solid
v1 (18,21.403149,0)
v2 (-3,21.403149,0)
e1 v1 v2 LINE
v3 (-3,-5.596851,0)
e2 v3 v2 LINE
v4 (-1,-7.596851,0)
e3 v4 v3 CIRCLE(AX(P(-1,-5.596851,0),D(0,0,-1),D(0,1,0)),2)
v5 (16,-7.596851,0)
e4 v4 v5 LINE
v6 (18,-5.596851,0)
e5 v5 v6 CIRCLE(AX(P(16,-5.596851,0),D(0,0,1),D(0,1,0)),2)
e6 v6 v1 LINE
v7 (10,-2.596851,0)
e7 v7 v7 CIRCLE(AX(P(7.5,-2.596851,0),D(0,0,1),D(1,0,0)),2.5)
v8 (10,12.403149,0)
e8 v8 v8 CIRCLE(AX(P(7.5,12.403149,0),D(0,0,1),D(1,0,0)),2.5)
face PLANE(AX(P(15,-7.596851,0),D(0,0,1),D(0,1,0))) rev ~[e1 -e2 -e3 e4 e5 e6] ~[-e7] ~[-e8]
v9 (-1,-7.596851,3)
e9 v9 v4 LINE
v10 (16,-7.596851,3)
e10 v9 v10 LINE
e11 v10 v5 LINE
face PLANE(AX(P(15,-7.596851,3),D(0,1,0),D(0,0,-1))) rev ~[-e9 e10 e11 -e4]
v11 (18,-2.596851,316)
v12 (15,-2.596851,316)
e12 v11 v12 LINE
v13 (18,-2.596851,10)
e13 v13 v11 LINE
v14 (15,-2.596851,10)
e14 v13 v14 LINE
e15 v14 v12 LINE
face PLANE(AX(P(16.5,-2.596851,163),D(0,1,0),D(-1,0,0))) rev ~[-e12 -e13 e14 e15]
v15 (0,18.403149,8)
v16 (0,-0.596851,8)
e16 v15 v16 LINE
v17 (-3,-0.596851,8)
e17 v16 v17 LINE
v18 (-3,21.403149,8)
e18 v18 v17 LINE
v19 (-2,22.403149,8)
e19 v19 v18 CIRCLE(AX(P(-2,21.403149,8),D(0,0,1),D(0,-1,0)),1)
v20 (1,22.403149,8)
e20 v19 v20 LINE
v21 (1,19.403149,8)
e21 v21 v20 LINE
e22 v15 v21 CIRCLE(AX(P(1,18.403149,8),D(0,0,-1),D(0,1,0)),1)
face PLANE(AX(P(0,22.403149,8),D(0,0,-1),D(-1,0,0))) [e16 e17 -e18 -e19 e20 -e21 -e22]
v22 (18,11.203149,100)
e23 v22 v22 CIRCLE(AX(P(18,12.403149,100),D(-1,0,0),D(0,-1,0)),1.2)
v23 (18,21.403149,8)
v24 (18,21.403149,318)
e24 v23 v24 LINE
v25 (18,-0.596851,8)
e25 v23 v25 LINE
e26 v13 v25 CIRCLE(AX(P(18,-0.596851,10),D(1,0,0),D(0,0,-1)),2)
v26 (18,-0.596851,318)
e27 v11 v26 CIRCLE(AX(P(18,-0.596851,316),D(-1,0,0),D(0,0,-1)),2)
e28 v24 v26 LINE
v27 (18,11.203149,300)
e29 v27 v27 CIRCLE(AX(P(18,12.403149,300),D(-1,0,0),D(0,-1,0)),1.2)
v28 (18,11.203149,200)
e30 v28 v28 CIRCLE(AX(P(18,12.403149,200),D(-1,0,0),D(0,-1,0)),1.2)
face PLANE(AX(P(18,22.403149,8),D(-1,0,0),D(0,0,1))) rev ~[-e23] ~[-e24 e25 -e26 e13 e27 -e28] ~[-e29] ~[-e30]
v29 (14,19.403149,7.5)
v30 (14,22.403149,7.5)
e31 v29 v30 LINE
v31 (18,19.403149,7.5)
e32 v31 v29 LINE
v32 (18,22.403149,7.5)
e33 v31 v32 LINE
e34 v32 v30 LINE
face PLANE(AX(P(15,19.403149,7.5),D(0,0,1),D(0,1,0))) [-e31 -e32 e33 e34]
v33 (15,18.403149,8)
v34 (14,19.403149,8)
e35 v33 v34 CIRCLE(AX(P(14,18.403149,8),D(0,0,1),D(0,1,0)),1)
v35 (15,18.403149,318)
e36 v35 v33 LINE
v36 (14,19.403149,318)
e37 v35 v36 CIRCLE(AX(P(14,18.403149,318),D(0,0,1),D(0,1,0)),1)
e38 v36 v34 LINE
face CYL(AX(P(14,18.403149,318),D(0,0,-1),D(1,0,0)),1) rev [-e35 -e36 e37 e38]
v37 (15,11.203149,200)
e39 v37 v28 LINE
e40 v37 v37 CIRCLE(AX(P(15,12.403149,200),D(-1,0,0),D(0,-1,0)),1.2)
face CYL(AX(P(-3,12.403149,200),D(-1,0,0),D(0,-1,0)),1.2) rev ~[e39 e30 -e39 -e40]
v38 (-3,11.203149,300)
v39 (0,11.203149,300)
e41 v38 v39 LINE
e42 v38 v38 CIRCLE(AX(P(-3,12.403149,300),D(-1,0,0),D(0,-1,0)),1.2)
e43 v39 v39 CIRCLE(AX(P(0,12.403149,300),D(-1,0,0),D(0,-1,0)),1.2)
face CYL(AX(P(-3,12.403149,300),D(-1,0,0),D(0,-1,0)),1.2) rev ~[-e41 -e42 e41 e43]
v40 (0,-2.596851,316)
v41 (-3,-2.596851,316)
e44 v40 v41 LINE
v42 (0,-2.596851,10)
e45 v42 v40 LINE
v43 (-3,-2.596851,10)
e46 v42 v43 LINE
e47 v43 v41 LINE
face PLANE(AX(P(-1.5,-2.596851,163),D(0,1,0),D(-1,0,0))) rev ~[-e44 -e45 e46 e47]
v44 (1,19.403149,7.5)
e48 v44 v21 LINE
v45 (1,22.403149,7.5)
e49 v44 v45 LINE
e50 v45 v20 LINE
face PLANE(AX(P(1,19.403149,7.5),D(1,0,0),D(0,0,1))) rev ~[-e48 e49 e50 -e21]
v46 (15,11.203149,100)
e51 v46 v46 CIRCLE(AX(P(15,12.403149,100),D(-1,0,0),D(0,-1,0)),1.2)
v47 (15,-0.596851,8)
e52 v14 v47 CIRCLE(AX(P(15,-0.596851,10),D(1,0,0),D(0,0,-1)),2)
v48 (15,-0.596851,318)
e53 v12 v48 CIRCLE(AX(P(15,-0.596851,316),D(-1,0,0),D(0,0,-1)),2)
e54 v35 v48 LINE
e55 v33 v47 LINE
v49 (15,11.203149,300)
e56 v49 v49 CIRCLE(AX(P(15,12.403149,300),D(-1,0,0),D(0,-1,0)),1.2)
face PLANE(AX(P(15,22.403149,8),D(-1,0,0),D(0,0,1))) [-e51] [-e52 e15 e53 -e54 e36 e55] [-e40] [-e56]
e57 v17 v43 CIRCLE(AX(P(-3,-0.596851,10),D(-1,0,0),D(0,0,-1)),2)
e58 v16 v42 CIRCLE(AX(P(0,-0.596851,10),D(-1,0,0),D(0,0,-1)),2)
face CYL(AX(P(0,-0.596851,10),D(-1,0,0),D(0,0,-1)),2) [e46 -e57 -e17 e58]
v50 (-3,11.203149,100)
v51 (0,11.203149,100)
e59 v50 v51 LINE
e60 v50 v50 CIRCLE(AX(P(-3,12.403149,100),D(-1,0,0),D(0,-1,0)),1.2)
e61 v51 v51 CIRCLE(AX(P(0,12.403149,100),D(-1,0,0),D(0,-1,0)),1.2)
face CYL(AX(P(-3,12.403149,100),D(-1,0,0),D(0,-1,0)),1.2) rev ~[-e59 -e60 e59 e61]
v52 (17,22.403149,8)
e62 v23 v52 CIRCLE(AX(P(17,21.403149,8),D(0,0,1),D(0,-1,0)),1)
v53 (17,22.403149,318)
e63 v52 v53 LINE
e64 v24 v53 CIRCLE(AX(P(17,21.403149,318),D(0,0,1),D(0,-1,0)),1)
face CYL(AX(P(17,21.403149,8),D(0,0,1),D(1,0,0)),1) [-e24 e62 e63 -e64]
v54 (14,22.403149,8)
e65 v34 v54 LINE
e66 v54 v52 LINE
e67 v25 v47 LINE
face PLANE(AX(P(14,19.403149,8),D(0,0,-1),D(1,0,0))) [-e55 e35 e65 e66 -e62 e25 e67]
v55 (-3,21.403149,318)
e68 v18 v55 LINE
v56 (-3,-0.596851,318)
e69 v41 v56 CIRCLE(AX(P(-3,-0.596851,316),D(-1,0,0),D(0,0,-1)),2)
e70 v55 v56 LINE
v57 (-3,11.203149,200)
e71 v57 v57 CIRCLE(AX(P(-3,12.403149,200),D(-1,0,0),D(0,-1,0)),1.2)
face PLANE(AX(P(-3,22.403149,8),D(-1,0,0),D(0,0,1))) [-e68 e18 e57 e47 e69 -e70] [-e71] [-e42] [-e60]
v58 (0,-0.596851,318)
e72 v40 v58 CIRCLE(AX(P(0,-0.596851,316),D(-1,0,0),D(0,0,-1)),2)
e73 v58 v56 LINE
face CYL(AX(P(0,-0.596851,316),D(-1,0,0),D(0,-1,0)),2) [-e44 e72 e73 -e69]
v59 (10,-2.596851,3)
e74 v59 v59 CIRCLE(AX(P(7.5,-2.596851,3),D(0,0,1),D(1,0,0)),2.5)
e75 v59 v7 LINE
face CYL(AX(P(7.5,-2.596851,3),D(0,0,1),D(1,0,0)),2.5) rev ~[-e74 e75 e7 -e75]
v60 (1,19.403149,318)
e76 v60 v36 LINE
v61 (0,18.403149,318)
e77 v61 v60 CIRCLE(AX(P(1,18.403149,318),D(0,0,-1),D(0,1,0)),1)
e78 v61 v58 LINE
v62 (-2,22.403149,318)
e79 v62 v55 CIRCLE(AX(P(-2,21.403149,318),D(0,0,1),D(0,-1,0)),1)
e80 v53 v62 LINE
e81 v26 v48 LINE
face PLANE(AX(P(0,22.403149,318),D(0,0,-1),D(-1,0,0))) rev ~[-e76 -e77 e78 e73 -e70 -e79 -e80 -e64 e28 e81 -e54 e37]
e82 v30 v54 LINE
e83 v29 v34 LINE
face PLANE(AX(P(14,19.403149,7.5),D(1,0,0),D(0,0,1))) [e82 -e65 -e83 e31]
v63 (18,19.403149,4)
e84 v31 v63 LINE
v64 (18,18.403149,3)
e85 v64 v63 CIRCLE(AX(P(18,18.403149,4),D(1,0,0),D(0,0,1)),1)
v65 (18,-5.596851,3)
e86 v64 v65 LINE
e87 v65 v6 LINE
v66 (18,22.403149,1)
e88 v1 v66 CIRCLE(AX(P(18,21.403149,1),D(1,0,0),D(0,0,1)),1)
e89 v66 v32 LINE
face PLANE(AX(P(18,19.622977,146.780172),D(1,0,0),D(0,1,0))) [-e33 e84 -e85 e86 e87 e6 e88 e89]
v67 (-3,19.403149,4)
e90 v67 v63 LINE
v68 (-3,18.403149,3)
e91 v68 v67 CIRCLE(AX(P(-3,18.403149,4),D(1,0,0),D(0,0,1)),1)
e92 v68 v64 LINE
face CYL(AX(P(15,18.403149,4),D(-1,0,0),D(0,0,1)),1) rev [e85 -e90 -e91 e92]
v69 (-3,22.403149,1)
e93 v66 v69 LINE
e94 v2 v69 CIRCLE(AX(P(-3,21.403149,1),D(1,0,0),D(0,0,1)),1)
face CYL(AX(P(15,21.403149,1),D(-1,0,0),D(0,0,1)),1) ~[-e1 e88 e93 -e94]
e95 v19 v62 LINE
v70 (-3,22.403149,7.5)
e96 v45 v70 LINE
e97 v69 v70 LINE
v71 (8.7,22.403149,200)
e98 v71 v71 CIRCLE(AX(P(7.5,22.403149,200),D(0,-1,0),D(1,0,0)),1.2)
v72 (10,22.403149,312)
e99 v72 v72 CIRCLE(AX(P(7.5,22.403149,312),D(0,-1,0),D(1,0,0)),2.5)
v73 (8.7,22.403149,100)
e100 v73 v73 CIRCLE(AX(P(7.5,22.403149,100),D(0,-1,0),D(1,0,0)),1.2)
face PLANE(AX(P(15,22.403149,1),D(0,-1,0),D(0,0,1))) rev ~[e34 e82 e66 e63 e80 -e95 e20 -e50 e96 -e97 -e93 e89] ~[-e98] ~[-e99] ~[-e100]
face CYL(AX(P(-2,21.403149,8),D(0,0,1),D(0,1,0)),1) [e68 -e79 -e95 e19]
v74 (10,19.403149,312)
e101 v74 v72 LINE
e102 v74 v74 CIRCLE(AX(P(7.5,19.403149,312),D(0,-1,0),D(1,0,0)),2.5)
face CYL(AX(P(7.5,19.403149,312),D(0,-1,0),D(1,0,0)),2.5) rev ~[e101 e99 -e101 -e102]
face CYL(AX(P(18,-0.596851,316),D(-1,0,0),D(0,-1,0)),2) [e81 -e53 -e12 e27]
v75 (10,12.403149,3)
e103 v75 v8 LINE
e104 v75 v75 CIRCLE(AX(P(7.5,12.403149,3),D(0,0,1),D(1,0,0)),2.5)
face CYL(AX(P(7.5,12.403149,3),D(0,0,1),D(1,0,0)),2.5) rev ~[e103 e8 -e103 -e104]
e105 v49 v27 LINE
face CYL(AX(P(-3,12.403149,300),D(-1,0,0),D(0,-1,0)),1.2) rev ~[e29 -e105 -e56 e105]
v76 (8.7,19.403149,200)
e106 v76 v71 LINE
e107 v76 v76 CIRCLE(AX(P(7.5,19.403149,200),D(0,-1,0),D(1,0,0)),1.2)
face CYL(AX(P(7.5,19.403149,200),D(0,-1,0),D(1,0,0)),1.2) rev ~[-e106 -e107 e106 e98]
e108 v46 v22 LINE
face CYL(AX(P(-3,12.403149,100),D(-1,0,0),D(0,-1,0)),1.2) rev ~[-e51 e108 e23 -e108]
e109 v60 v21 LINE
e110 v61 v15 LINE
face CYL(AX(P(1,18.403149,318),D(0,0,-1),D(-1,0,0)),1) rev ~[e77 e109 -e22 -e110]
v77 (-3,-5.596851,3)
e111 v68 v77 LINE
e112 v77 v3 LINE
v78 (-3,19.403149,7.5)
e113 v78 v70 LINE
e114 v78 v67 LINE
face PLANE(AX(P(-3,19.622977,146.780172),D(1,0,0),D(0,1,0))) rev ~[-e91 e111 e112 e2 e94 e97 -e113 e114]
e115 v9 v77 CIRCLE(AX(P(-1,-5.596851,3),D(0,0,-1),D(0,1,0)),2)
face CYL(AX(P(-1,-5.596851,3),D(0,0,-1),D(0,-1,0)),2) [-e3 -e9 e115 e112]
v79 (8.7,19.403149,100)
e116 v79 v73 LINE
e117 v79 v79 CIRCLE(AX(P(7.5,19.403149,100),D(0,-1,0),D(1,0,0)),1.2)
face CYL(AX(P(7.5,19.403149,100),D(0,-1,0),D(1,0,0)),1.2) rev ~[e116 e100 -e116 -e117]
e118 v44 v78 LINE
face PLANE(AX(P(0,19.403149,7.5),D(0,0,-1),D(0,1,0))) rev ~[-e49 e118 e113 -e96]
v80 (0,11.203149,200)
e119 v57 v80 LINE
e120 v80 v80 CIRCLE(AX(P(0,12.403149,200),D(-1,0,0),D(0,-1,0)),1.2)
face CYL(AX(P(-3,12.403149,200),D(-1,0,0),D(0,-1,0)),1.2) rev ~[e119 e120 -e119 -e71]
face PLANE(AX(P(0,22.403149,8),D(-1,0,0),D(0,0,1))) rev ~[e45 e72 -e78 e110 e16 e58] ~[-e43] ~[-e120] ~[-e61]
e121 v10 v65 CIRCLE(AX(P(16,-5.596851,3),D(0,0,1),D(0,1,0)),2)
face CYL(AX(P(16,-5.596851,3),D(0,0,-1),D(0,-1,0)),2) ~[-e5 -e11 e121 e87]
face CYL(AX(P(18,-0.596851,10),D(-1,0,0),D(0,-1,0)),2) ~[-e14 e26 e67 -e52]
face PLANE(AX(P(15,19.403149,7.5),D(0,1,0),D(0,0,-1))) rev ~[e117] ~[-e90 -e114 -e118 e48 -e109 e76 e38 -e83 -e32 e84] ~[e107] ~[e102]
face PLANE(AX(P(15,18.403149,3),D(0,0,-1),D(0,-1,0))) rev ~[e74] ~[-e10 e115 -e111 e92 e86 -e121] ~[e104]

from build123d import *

# Parameters (mm, degrees)
F1_DEPTH  = 15
F2_W      = 3
F2_H      = 310
F3_DEPTH  = 25
F4_R      = 2.5
F5_DEPTH  = 3
F6_W      = 1
F6_H      = 0.5
F7_DEPTH  = 3
F8_R      = 1
F9_R      = 2.5
F9_R_2    = 1.2
F10_DEPTH = 3
F11_R     = 1.2
F12_DEPTH = 34.2
F13_DEPTH = 3
F14_DEPTH = 3
F15_R     = 2


with BuildPart() as f1:
    # F0 (on Right) → F1 (new body)
    with BuildSketch(Plane.YZ):
        Polygon((-7.5968508422, 3), (-7.5968508422, 0), (22.4031491578, 0), (22.4031491578, 318), (19.4031491578, 318), (19.4031491578, 3), align=None)
    extrude(amount=F1_DEPTH)

    # F2 (on face) → F3 (join)
    with BuildSketch(Plane(origin=(0, 22.4031491578, 0), x_dir=(-1, 0, 0), z_dir=(0, 1, 0))):
        with Locations((1.5, 163)):
            Rectangle(F2_W, F2_H)
        with Locations((-16.5, 163)):
            Rectangle(F2_W, F2_H)
    extrude(amount=-F3_DEPTH)

    # F4 (on face) → F5 (cut)
    with BuildSketch(Plane.XY.offset(3)):
        with Locations((7.5, -2.5968508422)):
            Circle(F4_R)
        with Locations((7.5, 12.4031491578)):
            Circle(F4_R)
    extrude(amount=-F5_DEPTH, mode=Mode.SUBTRACT)

    # F6 (on face) → F7 (cut)
    with BuildSketch(Plane.XZ.offset(-19.4031491578)):
        with Locations((0.5, 7.75)):
            Rectangle(F6_W, F6_H)
        with Locations((14.5, 7.75)):
            Rectangle(F6_W, F6_H)
    extrude(amount=-F7_DEPTH, mode=Mode.SUBTRACT)

    # F8
    f8_edges = [f1.edges().sort_by_distance(p)[0] for p in [
        (7.5, 19.403149, 3),
        (7.5, 22.403149, 0),
        (0, 19.403149, 163),
        (-3, 22.403149, 163),
        (18, 22.403149, 163),
        (15, 19.403149, 163),
    ]]
    fillet(f8_edges, radius=F8_R)

    # F9 (on face) → F10 (cut)
    with BuildSketch(Plane.XZ.offset(-19.4031491578)):
        with Locations((7.5, 312)):
            Circle(F9_R)
        with Locations((7.5, 100)):
            Circle(F9_R_2)
        with Locations((7.5, 200)):
            Circle(F9_R_2)
    extrude(amount=-F10_DEPTH, mode=Mode.SUBTRACT)

    # F11 (on face) → F12 (cut)
    with BuildSketch(Plane(origin=(-3, 0, 0), x_dir=(0, -1, 0), z_dir=(-1, 0, 0))):
        with Locations((-12.4031491578, 300)):
            Circle(F11_R)
        with Locations((-12.4031491578, 100)):
            Circle(F11_R)
        with Locations((-12.4031491578, 200)):
            Circle(F11_R)
    extrude(amount=-F12_DEPTH, mode=Mode.SUBTRACT)

    # F13 (add): a face of the model
    f13_faces = [f1.faces().sort_by_distance(p)[0] for p in [
        (0, 9.1577983799, 1.9953507779),
    ]]
    extrude(f13_faces, amount=F13_DEPTH)

    # F14 (add): a face of the model
    f14_faces = [f1.faces().sort_by_distance(p)[0] for p in [
        (15, 9.1577983799, 1.9953507779),
    ]]
    extrude(f14_faces, amount=F14_DEPTH)

    # F15
    f15_edges = [f1.edges().sort_by_distance(p)[0] for p in [
        (-1.5, -2.596851, 8),
        (16.5, -2.596851, 8),
        (-3, -7.596851, 1.5),
        (18, -7.596851, 1.5),
        (-1.5, -2.596851, 318),
        (16.5, -2.596851, 318),
    ]]
    fillet(f15_edges, radius=F15_R)


solid = f1.part
